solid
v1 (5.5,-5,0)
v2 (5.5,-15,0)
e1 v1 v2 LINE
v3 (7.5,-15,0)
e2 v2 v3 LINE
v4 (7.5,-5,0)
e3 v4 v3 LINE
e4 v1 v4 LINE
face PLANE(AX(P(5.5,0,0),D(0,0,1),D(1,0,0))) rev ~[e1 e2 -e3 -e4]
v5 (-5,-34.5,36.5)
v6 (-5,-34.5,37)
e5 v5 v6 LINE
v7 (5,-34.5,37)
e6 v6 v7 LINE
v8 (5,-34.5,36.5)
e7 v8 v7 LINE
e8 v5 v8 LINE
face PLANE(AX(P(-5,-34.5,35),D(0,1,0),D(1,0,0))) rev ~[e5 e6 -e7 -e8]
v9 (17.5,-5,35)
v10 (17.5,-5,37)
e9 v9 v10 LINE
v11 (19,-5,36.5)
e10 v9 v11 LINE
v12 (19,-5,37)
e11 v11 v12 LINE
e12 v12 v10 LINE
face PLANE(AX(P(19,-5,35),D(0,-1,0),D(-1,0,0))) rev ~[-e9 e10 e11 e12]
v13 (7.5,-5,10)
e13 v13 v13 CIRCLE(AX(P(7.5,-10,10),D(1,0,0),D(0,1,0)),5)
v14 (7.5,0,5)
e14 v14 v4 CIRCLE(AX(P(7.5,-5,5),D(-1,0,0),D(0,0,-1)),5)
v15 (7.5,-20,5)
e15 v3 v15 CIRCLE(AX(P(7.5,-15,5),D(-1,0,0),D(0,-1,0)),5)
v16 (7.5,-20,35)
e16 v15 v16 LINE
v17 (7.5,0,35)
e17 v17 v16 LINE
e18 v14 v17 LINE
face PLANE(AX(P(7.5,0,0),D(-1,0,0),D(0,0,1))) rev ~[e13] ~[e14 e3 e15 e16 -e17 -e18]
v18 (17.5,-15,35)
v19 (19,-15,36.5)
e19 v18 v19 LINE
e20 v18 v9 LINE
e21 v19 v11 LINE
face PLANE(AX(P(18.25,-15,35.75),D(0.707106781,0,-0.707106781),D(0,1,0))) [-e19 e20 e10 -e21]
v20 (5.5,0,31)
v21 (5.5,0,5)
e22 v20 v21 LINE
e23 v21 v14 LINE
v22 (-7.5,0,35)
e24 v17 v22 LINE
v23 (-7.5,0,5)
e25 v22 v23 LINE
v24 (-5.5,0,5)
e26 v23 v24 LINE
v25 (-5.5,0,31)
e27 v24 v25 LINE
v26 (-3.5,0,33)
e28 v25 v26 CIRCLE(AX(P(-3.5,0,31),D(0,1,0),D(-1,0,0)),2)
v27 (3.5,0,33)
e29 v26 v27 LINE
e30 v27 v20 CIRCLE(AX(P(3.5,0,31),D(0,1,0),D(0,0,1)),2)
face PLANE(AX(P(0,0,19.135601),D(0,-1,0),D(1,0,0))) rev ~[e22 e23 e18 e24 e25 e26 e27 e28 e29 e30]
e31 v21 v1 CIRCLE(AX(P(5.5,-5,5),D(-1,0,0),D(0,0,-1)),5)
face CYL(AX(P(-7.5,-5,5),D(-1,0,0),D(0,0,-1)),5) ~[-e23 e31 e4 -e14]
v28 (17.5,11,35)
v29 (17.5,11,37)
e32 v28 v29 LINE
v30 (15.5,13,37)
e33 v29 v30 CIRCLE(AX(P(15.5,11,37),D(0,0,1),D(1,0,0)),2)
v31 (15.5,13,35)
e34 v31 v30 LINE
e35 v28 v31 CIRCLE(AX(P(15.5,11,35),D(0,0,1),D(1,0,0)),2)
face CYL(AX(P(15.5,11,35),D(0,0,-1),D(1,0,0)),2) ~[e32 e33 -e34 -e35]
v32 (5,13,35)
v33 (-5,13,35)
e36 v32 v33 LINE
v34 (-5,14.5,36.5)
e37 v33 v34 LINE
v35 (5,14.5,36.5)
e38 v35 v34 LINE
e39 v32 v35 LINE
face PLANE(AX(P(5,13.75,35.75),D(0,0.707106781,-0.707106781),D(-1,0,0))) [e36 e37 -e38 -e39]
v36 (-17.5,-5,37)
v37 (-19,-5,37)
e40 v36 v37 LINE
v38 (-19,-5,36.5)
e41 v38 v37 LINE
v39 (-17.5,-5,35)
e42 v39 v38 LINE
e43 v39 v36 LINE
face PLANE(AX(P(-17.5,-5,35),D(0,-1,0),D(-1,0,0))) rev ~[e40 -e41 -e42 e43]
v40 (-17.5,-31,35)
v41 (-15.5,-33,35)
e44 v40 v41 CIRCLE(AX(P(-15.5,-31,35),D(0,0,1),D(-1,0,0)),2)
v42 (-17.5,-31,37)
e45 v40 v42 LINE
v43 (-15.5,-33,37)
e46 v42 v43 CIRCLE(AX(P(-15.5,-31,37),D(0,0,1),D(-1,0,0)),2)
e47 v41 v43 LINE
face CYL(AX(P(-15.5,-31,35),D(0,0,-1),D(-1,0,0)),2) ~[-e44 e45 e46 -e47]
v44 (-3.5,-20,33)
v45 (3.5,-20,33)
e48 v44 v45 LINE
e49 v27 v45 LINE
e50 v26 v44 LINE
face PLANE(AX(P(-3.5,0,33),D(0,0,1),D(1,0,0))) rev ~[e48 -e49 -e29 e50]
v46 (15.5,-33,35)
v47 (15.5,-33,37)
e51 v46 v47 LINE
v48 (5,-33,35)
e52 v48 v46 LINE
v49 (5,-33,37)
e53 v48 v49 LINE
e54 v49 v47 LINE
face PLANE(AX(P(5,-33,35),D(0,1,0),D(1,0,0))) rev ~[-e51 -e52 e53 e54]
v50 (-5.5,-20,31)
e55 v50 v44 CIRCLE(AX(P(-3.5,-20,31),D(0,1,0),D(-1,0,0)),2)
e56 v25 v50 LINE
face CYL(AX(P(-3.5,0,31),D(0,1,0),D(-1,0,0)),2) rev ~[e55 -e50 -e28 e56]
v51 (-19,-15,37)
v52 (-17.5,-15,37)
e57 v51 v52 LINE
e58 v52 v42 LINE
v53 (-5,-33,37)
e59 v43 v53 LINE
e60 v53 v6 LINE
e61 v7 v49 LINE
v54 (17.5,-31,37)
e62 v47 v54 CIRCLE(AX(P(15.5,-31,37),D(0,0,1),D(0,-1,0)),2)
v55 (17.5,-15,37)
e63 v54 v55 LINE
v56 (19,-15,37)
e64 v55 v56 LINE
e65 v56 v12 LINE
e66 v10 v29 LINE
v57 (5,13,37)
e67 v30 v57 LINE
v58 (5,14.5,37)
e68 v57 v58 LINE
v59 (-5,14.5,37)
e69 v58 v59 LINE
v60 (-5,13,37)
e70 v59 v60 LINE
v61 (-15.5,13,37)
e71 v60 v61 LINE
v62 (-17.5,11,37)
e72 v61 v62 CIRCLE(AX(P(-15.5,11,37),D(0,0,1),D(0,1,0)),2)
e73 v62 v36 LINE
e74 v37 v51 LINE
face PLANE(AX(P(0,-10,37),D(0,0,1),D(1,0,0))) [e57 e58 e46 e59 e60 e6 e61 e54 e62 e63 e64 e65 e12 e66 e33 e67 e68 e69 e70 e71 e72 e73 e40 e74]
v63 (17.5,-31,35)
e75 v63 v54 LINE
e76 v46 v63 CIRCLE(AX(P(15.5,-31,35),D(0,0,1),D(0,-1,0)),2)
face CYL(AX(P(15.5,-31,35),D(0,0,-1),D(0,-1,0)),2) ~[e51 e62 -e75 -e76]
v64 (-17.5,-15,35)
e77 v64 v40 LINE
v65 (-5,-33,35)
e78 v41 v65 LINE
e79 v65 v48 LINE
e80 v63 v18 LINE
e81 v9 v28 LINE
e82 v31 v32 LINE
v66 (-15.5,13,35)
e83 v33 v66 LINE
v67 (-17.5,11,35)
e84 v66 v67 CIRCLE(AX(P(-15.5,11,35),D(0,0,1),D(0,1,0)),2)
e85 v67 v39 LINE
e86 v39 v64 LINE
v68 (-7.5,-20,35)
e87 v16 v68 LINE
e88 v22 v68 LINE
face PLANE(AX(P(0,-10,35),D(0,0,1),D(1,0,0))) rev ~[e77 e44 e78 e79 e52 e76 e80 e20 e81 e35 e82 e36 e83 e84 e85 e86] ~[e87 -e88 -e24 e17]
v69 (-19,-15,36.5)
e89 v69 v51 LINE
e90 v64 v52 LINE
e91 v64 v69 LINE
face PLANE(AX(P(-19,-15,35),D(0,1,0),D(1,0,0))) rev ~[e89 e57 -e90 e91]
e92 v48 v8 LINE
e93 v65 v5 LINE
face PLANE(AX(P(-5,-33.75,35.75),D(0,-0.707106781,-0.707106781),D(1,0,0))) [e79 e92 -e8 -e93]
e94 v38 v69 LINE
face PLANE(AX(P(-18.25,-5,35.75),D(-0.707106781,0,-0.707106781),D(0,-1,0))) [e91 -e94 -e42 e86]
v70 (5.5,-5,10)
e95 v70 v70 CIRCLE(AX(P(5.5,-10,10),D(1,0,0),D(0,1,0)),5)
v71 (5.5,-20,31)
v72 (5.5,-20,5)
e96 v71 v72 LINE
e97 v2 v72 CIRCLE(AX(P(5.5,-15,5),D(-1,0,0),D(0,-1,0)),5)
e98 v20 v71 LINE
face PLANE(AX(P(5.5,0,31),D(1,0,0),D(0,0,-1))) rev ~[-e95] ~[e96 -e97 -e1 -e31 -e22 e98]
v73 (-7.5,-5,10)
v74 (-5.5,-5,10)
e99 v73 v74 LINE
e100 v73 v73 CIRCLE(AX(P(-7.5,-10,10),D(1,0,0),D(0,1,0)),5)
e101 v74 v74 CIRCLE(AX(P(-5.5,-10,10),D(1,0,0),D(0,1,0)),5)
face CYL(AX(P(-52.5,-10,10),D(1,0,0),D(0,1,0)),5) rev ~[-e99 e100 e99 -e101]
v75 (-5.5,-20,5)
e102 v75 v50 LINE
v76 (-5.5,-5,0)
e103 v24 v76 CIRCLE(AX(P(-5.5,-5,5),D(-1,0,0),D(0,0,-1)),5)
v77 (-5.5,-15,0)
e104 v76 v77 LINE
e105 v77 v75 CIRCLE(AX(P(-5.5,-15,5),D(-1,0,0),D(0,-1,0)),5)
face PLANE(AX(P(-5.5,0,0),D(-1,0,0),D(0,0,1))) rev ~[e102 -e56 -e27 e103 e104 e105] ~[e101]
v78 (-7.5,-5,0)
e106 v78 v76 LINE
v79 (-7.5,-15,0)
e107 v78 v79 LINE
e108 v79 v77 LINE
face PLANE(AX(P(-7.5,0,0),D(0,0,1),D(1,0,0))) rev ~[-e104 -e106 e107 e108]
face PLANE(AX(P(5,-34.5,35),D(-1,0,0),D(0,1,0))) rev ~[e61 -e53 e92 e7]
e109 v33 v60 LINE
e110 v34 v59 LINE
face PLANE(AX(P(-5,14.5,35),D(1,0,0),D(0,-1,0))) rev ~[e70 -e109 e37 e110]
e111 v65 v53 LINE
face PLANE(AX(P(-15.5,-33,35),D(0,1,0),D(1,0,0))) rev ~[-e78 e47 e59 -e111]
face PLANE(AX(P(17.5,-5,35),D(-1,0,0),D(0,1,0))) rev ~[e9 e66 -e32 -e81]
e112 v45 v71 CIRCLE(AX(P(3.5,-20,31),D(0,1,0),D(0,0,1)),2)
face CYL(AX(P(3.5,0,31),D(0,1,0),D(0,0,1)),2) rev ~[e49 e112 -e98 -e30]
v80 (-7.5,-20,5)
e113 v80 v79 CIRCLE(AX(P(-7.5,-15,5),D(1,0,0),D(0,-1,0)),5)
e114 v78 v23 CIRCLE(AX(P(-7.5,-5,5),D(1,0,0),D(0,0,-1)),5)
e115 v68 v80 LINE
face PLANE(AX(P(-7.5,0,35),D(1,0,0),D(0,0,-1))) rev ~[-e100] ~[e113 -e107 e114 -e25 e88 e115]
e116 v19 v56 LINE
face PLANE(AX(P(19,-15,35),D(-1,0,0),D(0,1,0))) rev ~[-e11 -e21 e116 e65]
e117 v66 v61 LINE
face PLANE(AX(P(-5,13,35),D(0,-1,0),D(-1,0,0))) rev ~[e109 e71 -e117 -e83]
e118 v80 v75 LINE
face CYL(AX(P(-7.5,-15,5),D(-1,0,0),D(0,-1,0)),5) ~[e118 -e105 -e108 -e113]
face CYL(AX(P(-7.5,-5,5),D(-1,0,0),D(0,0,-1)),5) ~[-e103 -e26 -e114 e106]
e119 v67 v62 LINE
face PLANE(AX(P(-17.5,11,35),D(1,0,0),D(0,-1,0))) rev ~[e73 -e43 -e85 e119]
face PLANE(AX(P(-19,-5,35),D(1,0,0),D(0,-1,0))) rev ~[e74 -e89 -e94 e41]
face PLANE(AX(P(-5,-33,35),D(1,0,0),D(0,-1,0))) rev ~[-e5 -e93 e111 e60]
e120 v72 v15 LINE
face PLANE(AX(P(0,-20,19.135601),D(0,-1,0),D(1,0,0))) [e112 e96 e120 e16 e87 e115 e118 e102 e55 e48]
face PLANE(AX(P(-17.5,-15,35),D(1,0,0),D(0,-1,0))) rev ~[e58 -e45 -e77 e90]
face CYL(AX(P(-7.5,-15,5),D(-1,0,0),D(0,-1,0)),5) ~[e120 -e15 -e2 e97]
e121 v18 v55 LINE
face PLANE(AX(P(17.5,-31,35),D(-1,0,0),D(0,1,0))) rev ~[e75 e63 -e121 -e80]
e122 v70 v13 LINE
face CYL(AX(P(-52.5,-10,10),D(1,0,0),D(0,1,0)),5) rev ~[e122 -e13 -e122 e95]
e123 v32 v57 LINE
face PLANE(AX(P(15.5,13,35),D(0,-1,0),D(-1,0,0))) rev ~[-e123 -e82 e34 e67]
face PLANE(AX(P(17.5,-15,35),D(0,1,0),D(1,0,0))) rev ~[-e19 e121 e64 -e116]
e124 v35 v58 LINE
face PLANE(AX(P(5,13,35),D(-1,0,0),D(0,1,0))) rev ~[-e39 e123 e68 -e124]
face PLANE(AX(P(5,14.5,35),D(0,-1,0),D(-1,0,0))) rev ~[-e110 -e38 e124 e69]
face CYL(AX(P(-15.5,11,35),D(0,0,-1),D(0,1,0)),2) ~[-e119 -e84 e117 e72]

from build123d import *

# Parameters (mm, degrees)
F1_DEPTH = 20
F3_D     = 10
F3_DEPTH = 45
F3_TIP   = 3.0043030951
F4_W     = 15
F4_H     = 20
F5_DEPTH = 2
F6_DEPTH = 26.501
F7_SIZE  = 1.5


with BuildPart() as f1:
    # F0 (on Front) → F1 (new body)
    with BuildSketch(Plane.XZ):
        with BuildLine():
            Line((7.5, 35), (0, 35))
            Line((0, 35), (-7.5, 35))
            Line((-7.5, 35), (-7.5, 0))
            Line((-7.5, 0), (-5.5, 0))
            Line((-5.5, 0), (-5.5, 31))
            ThreePointArc((-5.5, 31), (-4.9142135624, 32.4142135624), (-3.5, 33))
            Line((-3.5, 33), (0, 33))
            Line((0, 33), (3.5, 33))
            ThreePointArc((3.5, 33), (4.9142135624, 32.4142135624), (5.5, 31))
            Line((5.5, 31), (5.5, 0))
            Line((5.5, 0), (7.5, 0))
            Line((7.5, 0), (7.5, 35))
        make_face()
    extrude(amount=F1_DEPTH)

    # F3
    with Locations(Plane(origin=(-7.5, 0, 0), x_dir=(0, -1, 0), z_dir=(-1, 0, 0))):
        with Locations((10, 10)):
            Hole(F3_D / 2, depth=F3_DEPTH)
            with Locations((0, 0, -(F3_DEPTH + F3_TIP / 2))):  # 118° drill point
                Cone(0, F3_D / 2, F3_TIP, mode=Mode.SUBTRACT)

    # F4 (on face) → F5 (join)
    with BuildSketch(Plane.XY.offset(35)):
        with BuildLine():
            Line((5, -33), (15.5, -33))
            ThreePointArc((15.5, -33), (16.9142135624, -32.4142135624), (17.5, -31))
            Line((17.5, -31), (17.5, -15))
            Line((17.5, -15), (17.5, -5))
            Line((17.5, -5), (17.5, 11))
            ThreePointArc((17.5, 11), (16.9142135624, 12.4142135624), (15.5, 13))
            Line((15.5, 13), (5, 13))
            Line((5, 13), (0, 13))
            Line((0, 13), (-5, 13))
            Line((-5, 13), (-15.5, 13))
            ThreePointArc((-15.5, 13), (-16.9142135624, 12.4142135624), (-17.5, 11))
            Line((-17.5, 11), (-17.5, -5))
            Line((-17.5, -5), (-17.5, -10))
            Line((-17.5, -10), (-17.5, -15))
            Line((-17.5, -15), (-17.5, -31))
            ThreePointArc((-17.5, -31), (-16.9142135624, -32.4142135624), (-15.5, -33))
            Line((-15.5, -33), (-5, -33))
            Line((-5, -33), (5, -33))
        make_face()
        with Locations((0, -10)):
            Rectangle(F4_W, F4_H, mode=Mode.SUBTRACT)
        Polygon((5, -34.5), (5, -33), (-5, -33), (-5, -34.5), (0, -34.5), align=None)
        Polygon((17.5, -5), (17.5, -15), (19, -15), (19, -10), (19, -5), align=None)
        Polygon((-19, -15), (-17.5, -15), (-17.5, -10), (-17.5, -5), (-19, -5), (-19, -10), align=None)
        Polygon((0, 13), (5, 13), (5, 14.5), (0, 14.5), (-5, 14.5), (-5, 13), align=None)
        with Locations((0, -10)):
            Rectangle(F4_W, F4_H)
    extrude(amount=F5_DEPTH)

    # F2 (on face) → F6 (cut, through all)
    with BuildSketch(Plane(origin=(-7.5, 0, 0), x_dir=(0, -1, 0), z_dir=(-1, 0, 0))):
        with BuildLine():
            Line((20, 0), (20, 5))
            ThreePointArc((20, 5), (18.5355339059, 1.4644660941), (15, 0))
            Line((15, 0), (20, 0))
        make_face()
        with BuildLine():
            ThreePointArc((5, 0), (1.4644660941, 1.4644660941), (0, 5))
            Line((0, 5), (0, 0))
            Line((0, 0), (5, 0))
        make_face()
    extrude(amount=-F6_DEPTH, mode=Mode.SUBTRACT)

    # F7
    f7_edges = [f1.edges().sort_by_distance(p)[0] for p in [
        (-19, -10, 35),
        (0, 14.5, 35),
        (19, -10, 35),
        (0, -34.5, 35),
    ]]
    chamfer(f7_edges, length=F7_SIZE)


solid = f1.part
